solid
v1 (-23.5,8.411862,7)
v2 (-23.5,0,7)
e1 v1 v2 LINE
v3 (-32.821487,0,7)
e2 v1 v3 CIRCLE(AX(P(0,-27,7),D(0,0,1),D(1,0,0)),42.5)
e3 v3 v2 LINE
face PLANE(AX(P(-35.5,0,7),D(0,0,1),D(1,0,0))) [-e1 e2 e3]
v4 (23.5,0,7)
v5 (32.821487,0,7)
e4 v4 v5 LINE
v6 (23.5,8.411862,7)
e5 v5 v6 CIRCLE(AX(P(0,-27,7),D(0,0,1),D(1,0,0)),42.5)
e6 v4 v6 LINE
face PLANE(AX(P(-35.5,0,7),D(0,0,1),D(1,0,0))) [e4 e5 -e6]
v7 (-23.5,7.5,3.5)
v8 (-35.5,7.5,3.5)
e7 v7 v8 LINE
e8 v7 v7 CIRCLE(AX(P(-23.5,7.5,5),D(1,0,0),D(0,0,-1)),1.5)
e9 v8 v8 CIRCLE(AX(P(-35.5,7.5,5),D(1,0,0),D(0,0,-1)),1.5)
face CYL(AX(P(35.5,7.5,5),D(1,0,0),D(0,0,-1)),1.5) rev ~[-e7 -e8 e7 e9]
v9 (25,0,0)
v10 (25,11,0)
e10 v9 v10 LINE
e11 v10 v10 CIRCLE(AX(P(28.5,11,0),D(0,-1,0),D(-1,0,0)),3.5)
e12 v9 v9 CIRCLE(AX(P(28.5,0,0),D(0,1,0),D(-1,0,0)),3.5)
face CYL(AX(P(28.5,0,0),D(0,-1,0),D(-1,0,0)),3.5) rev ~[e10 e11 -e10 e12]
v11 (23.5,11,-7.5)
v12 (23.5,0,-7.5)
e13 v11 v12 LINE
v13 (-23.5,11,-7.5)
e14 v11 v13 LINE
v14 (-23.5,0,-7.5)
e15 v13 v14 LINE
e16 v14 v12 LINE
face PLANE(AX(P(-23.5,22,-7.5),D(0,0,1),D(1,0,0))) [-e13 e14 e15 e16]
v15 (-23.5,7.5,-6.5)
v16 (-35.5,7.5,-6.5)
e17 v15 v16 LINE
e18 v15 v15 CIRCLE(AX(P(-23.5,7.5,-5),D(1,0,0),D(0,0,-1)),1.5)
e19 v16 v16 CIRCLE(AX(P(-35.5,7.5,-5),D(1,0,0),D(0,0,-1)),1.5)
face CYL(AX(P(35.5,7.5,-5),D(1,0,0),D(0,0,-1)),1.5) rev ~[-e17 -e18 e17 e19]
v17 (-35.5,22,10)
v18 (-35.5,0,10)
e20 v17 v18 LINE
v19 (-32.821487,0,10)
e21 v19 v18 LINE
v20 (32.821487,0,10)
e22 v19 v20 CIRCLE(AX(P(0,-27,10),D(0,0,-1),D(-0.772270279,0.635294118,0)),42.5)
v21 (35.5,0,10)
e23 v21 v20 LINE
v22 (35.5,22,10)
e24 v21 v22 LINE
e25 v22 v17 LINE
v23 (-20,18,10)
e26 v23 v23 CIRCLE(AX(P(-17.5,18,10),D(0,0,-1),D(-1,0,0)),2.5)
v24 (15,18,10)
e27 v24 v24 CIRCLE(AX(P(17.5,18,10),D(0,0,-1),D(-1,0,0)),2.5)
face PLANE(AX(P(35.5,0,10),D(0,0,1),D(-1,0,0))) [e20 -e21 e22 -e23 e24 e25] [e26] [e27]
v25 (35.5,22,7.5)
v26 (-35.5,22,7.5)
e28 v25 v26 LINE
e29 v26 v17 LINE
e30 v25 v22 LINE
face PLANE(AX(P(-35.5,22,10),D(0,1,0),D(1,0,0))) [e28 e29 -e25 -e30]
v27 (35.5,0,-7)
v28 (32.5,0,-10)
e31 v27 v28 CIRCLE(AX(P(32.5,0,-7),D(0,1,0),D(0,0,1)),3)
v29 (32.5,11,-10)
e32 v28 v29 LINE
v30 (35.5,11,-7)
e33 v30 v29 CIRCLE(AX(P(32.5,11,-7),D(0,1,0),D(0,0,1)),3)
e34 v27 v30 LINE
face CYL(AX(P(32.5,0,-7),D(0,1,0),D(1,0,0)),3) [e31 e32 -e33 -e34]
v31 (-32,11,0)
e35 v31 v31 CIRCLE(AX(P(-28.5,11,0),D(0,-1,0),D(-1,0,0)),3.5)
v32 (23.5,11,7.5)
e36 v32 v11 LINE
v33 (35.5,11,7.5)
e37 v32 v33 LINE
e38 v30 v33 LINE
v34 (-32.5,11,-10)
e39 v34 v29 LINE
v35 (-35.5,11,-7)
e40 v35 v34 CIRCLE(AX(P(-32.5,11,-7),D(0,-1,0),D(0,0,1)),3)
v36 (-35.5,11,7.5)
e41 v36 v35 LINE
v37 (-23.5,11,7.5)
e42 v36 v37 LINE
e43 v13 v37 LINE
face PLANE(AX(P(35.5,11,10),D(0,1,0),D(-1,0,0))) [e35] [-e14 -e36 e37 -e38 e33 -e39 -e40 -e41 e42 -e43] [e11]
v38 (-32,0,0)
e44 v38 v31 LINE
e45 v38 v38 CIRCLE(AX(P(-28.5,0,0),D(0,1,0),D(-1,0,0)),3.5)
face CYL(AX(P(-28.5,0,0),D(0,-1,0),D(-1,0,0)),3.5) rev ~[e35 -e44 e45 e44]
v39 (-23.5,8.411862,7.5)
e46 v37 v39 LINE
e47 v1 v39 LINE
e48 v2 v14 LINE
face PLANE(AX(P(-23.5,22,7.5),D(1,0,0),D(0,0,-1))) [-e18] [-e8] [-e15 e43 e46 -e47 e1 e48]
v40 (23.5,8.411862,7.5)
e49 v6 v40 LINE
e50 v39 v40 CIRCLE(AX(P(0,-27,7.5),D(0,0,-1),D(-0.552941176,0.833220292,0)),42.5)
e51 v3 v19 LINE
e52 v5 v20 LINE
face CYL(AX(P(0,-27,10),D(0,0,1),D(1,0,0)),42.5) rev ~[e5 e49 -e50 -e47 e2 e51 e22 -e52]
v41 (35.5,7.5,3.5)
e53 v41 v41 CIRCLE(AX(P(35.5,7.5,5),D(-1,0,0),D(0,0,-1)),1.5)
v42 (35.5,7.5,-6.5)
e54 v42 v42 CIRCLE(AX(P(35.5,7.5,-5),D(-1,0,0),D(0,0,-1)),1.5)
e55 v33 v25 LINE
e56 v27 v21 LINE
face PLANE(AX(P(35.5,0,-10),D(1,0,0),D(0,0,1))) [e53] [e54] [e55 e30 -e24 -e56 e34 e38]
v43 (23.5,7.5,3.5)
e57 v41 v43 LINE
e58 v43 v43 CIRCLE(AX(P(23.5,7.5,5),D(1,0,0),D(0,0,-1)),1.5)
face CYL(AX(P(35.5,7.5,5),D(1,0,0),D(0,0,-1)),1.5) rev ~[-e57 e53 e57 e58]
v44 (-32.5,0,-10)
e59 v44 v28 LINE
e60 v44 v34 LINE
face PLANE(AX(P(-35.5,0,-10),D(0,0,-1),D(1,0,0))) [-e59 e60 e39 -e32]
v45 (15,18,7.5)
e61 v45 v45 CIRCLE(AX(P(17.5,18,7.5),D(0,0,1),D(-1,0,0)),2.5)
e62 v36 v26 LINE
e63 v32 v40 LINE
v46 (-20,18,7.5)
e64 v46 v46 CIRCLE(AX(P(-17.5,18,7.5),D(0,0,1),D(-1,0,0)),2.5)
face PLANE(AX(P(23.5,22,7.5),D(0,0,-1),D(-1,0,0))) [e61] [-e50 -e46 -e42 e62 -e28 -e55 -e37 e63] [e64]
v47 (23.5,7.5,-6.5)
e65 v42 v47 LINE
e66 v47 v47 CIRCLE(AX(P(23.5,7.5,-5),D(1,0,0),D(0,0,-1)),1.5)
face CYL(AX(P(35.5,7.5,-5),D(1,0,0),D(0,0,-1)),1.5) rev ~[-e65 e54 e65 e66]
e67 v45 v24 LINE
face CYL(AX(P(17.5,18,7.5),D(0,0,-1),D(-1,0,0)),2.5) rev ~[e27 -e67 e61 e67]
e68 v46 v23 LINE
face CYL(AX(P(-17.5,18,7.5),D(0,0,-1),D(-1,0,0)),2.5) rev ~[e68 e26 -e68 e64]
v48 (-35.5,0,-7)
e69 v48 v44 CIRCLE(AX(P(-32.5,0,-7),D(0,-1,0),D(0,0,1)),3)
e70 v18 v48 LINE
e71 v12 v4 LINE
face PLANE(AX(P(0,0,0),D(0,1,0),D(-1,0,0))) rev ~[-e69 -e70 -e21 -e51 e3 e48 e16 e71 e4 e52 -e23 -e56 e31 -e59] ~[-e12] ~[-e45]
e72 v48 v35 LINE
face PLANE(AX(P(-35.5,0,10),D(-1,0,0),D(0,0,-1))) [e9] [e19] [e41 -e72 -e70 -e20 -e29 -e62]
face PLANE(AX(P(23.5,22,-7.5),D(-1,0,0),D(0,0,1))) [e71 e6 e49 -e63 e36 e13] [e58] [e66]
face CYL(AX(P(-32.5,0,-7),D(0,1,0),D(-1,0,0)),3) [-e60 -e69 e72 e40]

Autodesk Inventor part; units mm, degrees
ref_plane "YZ Plane" through (0, 0, 0) normal (1, 0, 0) x (0, 1, 0)
ref_plane "XZ Plane" through (0, 0, 0) normal (0, 1, 0) x (-1, 0, 0)
ref_plane "XY Plane" through (0, 0, 0) normal (0, 0, 1) x (1, 0, 0)
sketch "Esquisse1" plane through (0, 0, 0) normal (0, 1, 0) x (-1, 0, 0)
  circle A0 centre (-28.5, 0) radius 3.5
  circle A1 centre (28.5, 0) radius 3.5
  line L0 (-35.5, 10) -> (35.5, 10)
  line L1 (35.5, 10) -> (35.5, -10)
  line L2 (35.5, -10) -> (-35.5, -10)
  line L3 (-35.5, -10) -> (-35.5, 10)
  line L4 (-28.5, 0) -> (28.5, 0)
  point P0 (0, 0)
  dimension "d0" = 7
  dimension "d1" = 7
  dimension "d2" = 28.5
  dimension "d3" = 28.5
  dimension "d4" = 20
  dimension "d5" = 10
  dimension "d6" = 7
  dimension "d7" = 7
extrude "Extrusion1" add sketch "Esquisse1" along normal blind 22
sketch "Esquisse2" plane through (0, 22, 0) normal (0, 1, 0) x (1, 0, 0)
  circle A0 centre (-28.5, 0) radius 3.5 projected
  circle A1 centre (28.5, 0) radius 3.5 projected
  line L0 (-23.5, 7.5) -> (23.5, 7.5)
  line L1 (23.5, 7.5) -> (23.5, -7.5)
  line L2 (23.5, -7.5) -> (-23.5, -7.5)
  line L3 (-23.5, -7.5) -> (-23.5, 7.5)
  point P0 (0, 0)
  dimension "d10" = 15
  dimension "d11" = 7.5
  dimension "d12" = 5
  dimension "d13" = 5
extrude "Extrusion2" cut sketch "Esquisse2" against normal through all contours L0 L1 L2 L3
sketch "Esquisse3" plane through (-35.5, 0, 10) normal (0, 0, 1) x (1, 0, 0)
  line L0 (71, 0) -> (0, 0) projected
  line L1 (71, 0) -> (71, 22) projected
  line L2 (0, 22) -> (71, 22) projected
  line L3 (0, 0) -> (0, 22) projected
  line L4 (14, 22) -> (57, 22)
  line L5 (57, 22) -> (57, 0)
  line L6 (57, 0) -> (14, 0)
  line L7 (14, 0) -> (14, 22)
  line L8 (14, 22) -> (22, 22)
  line L9 (22, 22) -> (22, 14)
  line L10 (22, 14) -> (14, 14)
  line L11 (14, 14) -> (14, 22)
  line L12 (57, 22) -> (49, 22)
  line L13 (49, 22) -> (49, 14)
  line L14 (49, 14) -> (57, 14)
  line L15 (57, 14) -> (57, 22)
  line L16 (14, 22) -> (22, 14)
  line L17 (22, 22) -> (14, 14)
  line L18 (49, 14) -> (57, 22)
  line L19 (49, 22) -> (57, 14)
  circle A0 centre (18, 18) radius 2
  circle A1 centre (53, 18) radius 2
  point P0 (35.5, 0)
  dimension "d16" = 14
  dimension "d17" = 14
  dimension "d18" = 8
  dimension "d19" = 8
  dimension "d20" = 8
  dimension "d21" = 8
  dimension "d22" = 4
  dimension "d23" = 4
sketch "Esquisse3 outline for Extrusion3" plane through (-35.5, 0, 10) normal (0, 0, 1) x (1, 0, 0)
  circle A0 centre (18, 18) radius 2
  circle A1 centre (53, 18) radius 2
extrude "Extrusion3" add sketch "Esquisse3 outline for Extrusion3" along normal through all both and the other way through all
sketch "Esquisse4" plane through (35.5, 0, 10) normal (1, 0, 0) x (0, 0, -1)
  line L0 (20, 0) -> (0, 0) projected
  line L1 (0, 22) -> (20, 22) projected
  line L2 (6.5, 22) -> (13.5, 22)
  line L3 (13.5, 22) -> (13.5, 0)
  line L4 (13.5, 0) -> (6.5, 0)
  line L5 (6.5, 0) -> (6.5, 22)
  circle A0 centre (5, 7.5) radius 1.5
  circle A1 centre (15, 7.5) radius 1.5
  line L6 (20, 0) -> (20, 22) projected
  line L7 (0, 0) -> (6.5, 0)
  line L8 (6.5, 0) -> (6.5, 15)
  line L9 (6.5, 15) -> (0, 15)
  line L10 (0, 15) -> (0, 0)
  line L11 (13.5, 0) -> (20, 0)
  line L12 (20, 0) -> (20, 15)
  line L13 (20, 15) -> (13.5, 15)
  line L14 (13.5, 15) -> (13.5, 0)
  line L15 (0, 0) -> (0, 22) projected
  line L16 (13.5, 7.5) -> (20, 7.5)
  line L17 (0, 7.5) -> (6.5, 7.5)
  point P0 (10, 0)
  dimension "d26" = 7
  dimension "d27" = 3.5
  dimension "d28" = 3
  dimension "d29" = 3
  dimension "d32" = 15
extrude "Extrusion4" cut sketch "Esquisse4" against normal through all contours L16 A1 | A1 L16 | L17 A0 | A0 L17
sketch "Esquisse5" plane through (-35.5, 0, 10) normal (0, 0, 1) x (1, 0, 0)
  line L0 (71, 0) -> (0, 0) projected
  line L1 (71, 0) -> (71, 22) projected
  line L2 (0, 22) -> (71, 22) projected
  line L3 (0, 0) -> (0, 22) projected
  line L4 (0, 0) -> (71, 0)
  line L5 (71, 0) -> (71, 11)
  line L6 (71, 11) -> (0, 11)
  line L7 (0, 11) -> (0, 0)
  point P0 (35.5, 0)
  dimension "d33" = 11
  dimension "d34" = 22
extrude "Extrusion5" cut sketch "Esquisse5" against normal through all both and the other way through all contours L6 L3 L2 L1
sketch "Esquisse6" plane through (-35.5, 11, 10) normal (0, 1, 0) x (1, 0, 0)
  line L0 (71, 0) -> (0, 0) projected
  line L1 (59, 2.5) -> (59, 17.5) projected
  line L2 (12, 2.5) -> (59, 2.5)
  line L3 (59, 2.5) -> (59, 0)
  line L4 (59, 0) -> (12, 0)
  line L5 (12, 0) -> (12, 2.5)
  line L6 (0, 0) -> (12, 0)
  line L7 (12, 0) -> (12, 2.5)
  line L8 (12, 2.5) -> (0, 2.5)
  line L9 (0, 2.5) -> (0, 0)
  line L10 (71, 0) -> (59, 0)
  line L11 (59, 0) -> (59, 2.5)
  line L12 (59, 2.5) -> (71, 2.5)
  line L13 (71, 2.5) -> (71, 0)
  point P0 (35.5, 10)
extrude "Extrusion6" add sketch "Esquisse6" along normal blind 11
sketch "Esquisse7" plane through (-35.5, 0, 10) normal (0, 0, 1) x (1, 0, 0)
  line L0 (0, 22) -> (71, 22) projected
  line L1 (35.5, 0) -> (35.5, 22)
  line L2 (35.5, 0) -> (35.5, -27)
  circle A0 centre (35.5, -27) radius 42.5
  point P0 (59, 22)
  point P1 (12, 22)
  dimension "d39" = 27
  dimension "d40" = 85
extrude "Extrusion7" cut sketch "Esquisse7" against normal blind 3
sketch "Esquisse8" plane through (-23.5, 11, 7.5) normal (0, 0, -1) x (-1, 0, 0)
  line L0 (12, 0) -> (-59, 0)
  line L1 (12, 0) -> (12, 11)
  line L2 (-59, 11) -> (12, 11)
  line L3 (-59, 0) -> (-59, 11)
  line L4 (-45, 11) -> (-2, 11)
  line L5 (-2, 11) -> (-2, 0)
  line L6 (-2, 0) -> (-45, 0)
  line L7 (-45, 0) -> (-45, 11)
  line L8 (-45, 11) -> (-37, 11)
  line L9 (-37, 11) -> (-37, 3)
  line L10 (-37, 3) -> (-45, 3)
  line L11 (-45, 3) -> (-45, 11)
  line L12 (-2, 11) -> (-10, 11)
  line L13 (-10, 11) -> (-10, 3)
  line L14 (-10, 3) -> (-2, 3)
  line L15 (-2, 3) -> (-2, 11)
  line L16 (-45, 11) -> (-37, 3)
  line L17 (-37, 11) -> (-45, 3)
  line L18 (-10, 3) -> (-2, 11)
  line L19 (-10, 11) -> (-2, 3)
  circle A0 centre (-41, 7) radius 2.5
  circle A1 centre (-6, 7) radius 2.5
  point P0 (-23.5, -11)
  point P1 (35.5, 0)
  dimension "d43" = 14
  dimension "d44" = 14
  dimension "d45" = 8
  dimension "d46" = 8
  dimension "d47" = 8
  dimension "d48" = 8
  dimension "d49" = 5
  dimension "d50" = 5
extrude "Extrusion8" cut sketch "Esquisse8" against normal through all contours A1 L18 L19 | L19 L18 A1 | L18 L19 A1 | A0 L16 L17 | L17 L16 A0 | A1 L19 L18 | A0 L17 L16 | L16 L17 A0
fillet "Congé1" radius 3 2 edges at (35.5, 5.5, -10) (-35.5, 5.5, -10)
equation "\"d3\" = d2"
equation "\"d5\" = 0.5 * d4"
equation "\"d11\" = 0.5 * d10"
equation "\"d17\" = d16"
equation "\"d27\" = 0.5 * d26"
equation "\"d44\" = d43"
properties part number "tendeur_base_low"
